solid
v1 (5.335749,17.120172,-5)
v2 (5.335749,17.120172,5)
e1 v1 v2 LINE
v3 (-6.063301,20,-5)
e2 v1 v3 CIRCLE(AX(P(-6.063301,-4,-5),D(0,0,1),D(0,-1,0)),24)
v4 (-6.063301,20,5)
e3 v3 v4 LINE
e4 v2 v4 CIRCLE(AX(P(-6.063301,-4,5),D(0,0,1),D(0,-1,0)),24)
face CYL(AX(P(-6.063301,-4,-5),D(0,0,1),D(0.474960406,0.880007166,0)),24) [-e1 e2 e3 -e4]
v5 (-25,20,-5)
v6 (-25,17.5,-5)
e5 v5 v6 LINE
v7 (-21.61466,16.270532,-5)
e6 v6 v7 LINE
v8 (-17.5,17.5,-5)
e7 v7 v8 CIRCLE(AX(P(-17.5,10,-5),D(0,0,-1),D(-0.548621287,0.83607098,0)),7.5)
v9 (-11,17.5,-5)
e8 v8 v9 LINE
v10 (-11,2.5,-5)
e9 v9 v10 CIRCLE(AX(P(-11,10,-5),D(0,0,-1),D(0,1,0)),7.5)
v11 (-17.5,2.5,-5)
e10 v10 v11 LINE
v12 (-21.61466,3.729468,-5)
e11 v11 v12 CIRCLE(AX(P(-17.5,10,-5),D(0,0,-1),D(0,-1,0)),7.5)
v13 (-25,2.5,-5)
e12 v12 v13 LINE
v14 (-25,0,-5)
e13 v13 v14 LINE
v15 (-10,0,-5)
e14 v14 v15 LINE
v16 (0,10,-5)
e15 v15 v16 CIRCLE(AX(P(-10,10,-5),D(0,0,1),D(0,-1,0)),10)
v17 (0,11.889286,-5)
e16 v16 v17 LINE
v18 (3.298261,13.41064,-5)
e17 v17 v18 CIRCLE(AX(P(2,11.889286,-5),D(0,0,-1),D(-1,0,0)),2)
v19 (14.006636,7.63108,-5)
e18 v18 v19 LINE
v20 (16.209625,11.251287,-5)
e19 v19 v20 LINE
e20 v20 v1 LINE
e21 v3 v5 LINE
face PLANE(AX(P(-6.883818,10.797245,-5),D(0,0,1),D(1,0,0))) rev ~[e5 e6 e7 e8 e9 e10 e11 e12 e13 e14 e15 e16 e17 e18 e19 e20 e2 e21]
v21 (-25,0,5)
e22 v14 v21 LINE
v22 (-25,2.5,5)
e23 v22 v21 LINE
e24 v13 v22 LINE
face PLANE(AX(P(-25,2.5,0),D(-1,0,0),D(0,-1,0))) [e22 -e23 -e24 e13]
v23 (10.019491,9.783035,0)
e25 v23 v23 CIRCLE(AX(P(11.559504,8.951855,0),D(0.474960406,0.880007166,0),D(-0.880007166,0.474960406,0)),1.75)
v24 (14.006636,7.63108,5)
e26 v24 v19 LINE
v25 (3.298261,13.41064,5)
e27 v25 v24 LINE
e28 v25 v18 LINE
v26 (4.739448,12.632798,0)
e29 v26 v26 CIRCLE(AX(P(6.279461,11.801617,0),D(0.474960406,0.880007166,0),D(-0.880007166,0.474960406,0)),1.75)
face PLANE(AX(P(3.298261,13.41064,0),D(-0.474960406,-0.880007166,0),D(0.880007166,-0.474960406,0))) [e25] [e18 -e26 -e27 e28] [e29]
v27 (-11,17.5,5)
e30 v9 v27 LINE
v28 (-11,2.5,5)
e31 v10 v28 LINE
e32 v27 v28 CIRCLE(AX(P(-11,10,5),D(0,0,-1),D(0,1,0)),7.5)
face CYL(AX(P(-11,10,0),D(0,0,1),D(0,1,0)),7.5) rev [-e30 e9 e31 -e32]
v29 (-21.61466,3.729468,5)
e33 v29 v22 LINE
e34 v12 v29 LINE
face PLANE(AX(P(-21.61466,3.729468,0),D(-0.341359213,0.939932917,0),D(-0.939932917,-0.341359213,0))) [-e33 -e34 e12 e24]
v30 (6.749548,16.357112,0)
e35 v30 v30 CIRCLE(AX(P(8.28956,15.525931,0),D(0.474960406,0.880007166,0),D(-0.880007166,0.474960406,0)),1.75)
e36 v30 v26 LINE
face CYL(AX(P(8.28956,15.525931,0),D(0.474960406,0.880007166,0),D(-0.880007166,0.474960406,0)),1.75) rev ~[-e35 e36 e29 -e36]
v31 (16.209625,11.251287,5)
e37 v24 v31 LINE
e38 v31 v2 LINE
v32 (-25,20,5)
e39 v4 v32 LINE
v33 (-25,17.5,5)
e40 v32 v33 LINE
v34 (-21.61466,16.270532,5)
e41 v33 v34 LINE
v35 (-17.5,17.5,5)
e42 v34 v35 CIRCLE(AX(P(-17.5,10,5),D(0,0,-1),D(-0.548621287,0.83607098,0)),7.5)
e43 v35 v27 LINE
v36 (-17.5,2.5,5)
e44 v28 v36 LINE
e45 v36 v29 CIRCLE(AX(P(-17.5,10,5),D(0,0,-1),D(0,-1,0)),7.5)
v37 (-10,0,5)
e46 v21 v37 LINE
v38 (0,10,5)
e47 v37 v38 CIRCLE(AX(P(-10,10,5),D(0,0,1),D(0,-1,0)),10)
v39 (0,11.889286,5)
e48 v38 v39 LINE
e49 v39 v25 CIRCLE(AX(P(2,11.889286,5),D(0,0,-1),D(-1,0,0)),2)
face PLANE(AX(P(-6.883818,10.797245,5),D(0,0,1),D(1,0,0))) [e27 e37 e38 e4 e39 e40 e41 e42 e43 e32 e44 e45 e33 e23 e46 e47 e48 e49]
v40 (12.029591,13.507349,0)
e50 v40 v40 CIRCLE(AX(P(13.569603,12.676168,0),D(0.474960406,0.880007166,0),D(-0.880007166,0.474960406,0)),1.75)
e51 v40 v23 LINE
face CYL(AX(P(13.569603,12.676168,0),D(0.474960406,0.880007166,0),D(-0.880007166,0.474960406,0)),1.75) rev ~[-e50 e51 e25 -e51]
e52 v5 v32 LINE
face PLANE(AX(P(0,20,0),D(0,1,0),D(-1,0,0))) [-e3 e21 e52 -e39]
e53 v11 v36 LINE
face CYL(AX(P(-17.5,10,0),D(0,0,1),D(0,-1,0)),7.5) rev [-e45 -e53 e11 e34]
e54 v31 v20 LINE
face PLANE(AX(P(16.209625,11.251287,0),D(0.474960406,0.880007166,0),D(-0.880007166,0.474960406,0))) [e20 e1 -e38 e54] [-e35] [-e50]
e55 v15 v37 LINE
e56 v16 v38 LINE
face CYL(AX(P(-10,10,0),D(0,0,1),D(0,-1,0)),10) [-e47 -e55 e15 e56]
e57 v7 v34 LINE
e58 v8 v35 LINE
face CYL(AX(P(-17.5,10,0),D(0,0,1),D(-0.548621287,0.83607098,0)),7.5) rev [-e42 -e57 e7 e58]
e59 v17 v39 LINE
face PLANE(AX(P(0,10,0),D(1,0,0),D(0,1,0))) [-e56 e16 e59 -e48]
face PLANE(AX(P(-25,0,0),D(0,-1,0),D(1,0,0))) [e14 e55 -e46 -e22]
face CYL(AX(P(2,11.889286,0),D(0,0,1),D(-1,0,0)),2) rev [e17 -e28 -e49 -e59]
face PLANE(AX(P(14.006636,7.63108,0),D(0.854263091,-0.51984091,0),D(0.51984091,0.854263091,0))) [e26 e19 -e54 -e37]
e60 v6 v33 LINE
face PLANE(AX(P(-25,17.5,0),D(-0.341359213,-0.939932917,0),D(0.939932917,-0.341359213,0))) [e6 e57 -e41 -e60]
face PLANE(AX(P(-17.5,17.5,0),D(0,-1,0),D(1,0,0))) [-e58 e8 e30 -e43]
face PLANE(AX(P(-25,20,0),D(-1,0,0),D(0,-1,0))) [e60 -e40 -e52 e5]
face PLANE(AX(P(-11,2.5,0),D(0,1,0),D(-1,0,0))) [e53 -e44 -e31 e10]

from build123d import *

# Parameters (mm, degrees)
F1_DEPTH = 5
F2_R     = 1.75
F3_DEPTH = 9.9
F4_R     = 24


# Not quite as in the source:
# - a feature names something its author has since deleted; it is built from what else it names


with BuildPart() as f1:
    # F0 (on Top) → F1 (new body, symmetric)
    with BuildSketch(Plane.XY):
        with BuildLine():
            Line((16.2096246684, 11.2512872423), (0, 20))
            Line((0, 20), (-25, 20))
            Line((-25, 20), (-25, 17.5))
            Line((-25, 17.5), (-17.5, 17.5))
            Line((-17.5, 17.5), (-11, 17.5))
            Line((-11, 17.5), (-3.5, 17.5))
            Line((-3.5, 17.5), (-3.5, 10))
            Line((-3.5, 10), (-3.5, 2.5))
            Line((-3.5, 2.5), (-11, 2.5))
            Line((-11, 2.5), (-17.5, 2.5))
            Line((-17.5, 2.5), (-25, 2.5))
            Line((-25, 2.5), (-25, 0))
            Line((-25, 0), (-10, 0))
            ThreePointArc((-10, 0), (-2.9289321881, 2.9289321881), (0, 10))
            Line((0, 10), (0, 11.8892861952))
            ThreePointArc((0, 11.8892861952), (1.1623016269, 13.7053978206), (3.2982614357, 13.4106399491))
            Line((3.2982614357, 13.4106399491), (14.0066361954, 7.6310801635))
            Line((14.0066361954, 7.6310801635), (16.2096246684, 11.2512872423))
        make_face()
        with BuildLine():
            Line((-17.5, 17.5), (-25, 17.5))
            Line((-25, 17.5), (-21.614659653, 16.270532349))
            ThreePointArc((-21.614659653, 16.270532349), (-19.6472083483, 17.186062643), (-17.5, 17.5))
        make_face()
        with BuildLine():
            Line((-21.614659653, 3.729467651), (-25, 2.5))
            Line((-25, 2.5), (-17.5, 2.5))
            ThreePointArc((-17.5, 2.5), (-19.6472083483, 2.813937357), (-21.614659653, 3.729467651))
        make_face()
        with BuildLine():
            Line((-3.5, 17.5), (-11, 17.5))
            ThreePointArc((-11, 17.5), (-5.6966991411, 15.3033008589), (-3.5, 10))
            Line((-3.5, 10), (-3.5, 17.5))
        make_face()
        with BuildLine():
            Line((-3.5, 2.5), (-3.5, 10))
            ThreePointArc((-3.5, 10), (-5.6966991411, 4.6966991411), (-11, 2.5))
            Line((-11, 2.5), (-3.5, 2.5))
        make_face()
    extrude(amount=F1_DEPTH, both=True)

    # F2 (on face) → F3 (cut)
    with BuildSketch(Plane(origin=(8.3593712251, 15.4882522465, 0), x_dir=(-0.8800071661, 0.4749604064, 0), z_dir=(0.4749604064, 0.8800071661, 0))):
        with Locations((-5.9206699059, 0)):
            Circle(F2_R)
        with Locations((0.0793300941, 0)):
            Circle(F2_R)
    extrude(amount=-F3_DEPTH, mode=Mode.SUBTRACT)

    # F4
    f4_edges = [f1.edges().sort_by_distance(p)[0] for p in [
        (0, 20, 0),
    ]]
    fillet(f4_edges, radius=F4_R)


solid = f1.part
